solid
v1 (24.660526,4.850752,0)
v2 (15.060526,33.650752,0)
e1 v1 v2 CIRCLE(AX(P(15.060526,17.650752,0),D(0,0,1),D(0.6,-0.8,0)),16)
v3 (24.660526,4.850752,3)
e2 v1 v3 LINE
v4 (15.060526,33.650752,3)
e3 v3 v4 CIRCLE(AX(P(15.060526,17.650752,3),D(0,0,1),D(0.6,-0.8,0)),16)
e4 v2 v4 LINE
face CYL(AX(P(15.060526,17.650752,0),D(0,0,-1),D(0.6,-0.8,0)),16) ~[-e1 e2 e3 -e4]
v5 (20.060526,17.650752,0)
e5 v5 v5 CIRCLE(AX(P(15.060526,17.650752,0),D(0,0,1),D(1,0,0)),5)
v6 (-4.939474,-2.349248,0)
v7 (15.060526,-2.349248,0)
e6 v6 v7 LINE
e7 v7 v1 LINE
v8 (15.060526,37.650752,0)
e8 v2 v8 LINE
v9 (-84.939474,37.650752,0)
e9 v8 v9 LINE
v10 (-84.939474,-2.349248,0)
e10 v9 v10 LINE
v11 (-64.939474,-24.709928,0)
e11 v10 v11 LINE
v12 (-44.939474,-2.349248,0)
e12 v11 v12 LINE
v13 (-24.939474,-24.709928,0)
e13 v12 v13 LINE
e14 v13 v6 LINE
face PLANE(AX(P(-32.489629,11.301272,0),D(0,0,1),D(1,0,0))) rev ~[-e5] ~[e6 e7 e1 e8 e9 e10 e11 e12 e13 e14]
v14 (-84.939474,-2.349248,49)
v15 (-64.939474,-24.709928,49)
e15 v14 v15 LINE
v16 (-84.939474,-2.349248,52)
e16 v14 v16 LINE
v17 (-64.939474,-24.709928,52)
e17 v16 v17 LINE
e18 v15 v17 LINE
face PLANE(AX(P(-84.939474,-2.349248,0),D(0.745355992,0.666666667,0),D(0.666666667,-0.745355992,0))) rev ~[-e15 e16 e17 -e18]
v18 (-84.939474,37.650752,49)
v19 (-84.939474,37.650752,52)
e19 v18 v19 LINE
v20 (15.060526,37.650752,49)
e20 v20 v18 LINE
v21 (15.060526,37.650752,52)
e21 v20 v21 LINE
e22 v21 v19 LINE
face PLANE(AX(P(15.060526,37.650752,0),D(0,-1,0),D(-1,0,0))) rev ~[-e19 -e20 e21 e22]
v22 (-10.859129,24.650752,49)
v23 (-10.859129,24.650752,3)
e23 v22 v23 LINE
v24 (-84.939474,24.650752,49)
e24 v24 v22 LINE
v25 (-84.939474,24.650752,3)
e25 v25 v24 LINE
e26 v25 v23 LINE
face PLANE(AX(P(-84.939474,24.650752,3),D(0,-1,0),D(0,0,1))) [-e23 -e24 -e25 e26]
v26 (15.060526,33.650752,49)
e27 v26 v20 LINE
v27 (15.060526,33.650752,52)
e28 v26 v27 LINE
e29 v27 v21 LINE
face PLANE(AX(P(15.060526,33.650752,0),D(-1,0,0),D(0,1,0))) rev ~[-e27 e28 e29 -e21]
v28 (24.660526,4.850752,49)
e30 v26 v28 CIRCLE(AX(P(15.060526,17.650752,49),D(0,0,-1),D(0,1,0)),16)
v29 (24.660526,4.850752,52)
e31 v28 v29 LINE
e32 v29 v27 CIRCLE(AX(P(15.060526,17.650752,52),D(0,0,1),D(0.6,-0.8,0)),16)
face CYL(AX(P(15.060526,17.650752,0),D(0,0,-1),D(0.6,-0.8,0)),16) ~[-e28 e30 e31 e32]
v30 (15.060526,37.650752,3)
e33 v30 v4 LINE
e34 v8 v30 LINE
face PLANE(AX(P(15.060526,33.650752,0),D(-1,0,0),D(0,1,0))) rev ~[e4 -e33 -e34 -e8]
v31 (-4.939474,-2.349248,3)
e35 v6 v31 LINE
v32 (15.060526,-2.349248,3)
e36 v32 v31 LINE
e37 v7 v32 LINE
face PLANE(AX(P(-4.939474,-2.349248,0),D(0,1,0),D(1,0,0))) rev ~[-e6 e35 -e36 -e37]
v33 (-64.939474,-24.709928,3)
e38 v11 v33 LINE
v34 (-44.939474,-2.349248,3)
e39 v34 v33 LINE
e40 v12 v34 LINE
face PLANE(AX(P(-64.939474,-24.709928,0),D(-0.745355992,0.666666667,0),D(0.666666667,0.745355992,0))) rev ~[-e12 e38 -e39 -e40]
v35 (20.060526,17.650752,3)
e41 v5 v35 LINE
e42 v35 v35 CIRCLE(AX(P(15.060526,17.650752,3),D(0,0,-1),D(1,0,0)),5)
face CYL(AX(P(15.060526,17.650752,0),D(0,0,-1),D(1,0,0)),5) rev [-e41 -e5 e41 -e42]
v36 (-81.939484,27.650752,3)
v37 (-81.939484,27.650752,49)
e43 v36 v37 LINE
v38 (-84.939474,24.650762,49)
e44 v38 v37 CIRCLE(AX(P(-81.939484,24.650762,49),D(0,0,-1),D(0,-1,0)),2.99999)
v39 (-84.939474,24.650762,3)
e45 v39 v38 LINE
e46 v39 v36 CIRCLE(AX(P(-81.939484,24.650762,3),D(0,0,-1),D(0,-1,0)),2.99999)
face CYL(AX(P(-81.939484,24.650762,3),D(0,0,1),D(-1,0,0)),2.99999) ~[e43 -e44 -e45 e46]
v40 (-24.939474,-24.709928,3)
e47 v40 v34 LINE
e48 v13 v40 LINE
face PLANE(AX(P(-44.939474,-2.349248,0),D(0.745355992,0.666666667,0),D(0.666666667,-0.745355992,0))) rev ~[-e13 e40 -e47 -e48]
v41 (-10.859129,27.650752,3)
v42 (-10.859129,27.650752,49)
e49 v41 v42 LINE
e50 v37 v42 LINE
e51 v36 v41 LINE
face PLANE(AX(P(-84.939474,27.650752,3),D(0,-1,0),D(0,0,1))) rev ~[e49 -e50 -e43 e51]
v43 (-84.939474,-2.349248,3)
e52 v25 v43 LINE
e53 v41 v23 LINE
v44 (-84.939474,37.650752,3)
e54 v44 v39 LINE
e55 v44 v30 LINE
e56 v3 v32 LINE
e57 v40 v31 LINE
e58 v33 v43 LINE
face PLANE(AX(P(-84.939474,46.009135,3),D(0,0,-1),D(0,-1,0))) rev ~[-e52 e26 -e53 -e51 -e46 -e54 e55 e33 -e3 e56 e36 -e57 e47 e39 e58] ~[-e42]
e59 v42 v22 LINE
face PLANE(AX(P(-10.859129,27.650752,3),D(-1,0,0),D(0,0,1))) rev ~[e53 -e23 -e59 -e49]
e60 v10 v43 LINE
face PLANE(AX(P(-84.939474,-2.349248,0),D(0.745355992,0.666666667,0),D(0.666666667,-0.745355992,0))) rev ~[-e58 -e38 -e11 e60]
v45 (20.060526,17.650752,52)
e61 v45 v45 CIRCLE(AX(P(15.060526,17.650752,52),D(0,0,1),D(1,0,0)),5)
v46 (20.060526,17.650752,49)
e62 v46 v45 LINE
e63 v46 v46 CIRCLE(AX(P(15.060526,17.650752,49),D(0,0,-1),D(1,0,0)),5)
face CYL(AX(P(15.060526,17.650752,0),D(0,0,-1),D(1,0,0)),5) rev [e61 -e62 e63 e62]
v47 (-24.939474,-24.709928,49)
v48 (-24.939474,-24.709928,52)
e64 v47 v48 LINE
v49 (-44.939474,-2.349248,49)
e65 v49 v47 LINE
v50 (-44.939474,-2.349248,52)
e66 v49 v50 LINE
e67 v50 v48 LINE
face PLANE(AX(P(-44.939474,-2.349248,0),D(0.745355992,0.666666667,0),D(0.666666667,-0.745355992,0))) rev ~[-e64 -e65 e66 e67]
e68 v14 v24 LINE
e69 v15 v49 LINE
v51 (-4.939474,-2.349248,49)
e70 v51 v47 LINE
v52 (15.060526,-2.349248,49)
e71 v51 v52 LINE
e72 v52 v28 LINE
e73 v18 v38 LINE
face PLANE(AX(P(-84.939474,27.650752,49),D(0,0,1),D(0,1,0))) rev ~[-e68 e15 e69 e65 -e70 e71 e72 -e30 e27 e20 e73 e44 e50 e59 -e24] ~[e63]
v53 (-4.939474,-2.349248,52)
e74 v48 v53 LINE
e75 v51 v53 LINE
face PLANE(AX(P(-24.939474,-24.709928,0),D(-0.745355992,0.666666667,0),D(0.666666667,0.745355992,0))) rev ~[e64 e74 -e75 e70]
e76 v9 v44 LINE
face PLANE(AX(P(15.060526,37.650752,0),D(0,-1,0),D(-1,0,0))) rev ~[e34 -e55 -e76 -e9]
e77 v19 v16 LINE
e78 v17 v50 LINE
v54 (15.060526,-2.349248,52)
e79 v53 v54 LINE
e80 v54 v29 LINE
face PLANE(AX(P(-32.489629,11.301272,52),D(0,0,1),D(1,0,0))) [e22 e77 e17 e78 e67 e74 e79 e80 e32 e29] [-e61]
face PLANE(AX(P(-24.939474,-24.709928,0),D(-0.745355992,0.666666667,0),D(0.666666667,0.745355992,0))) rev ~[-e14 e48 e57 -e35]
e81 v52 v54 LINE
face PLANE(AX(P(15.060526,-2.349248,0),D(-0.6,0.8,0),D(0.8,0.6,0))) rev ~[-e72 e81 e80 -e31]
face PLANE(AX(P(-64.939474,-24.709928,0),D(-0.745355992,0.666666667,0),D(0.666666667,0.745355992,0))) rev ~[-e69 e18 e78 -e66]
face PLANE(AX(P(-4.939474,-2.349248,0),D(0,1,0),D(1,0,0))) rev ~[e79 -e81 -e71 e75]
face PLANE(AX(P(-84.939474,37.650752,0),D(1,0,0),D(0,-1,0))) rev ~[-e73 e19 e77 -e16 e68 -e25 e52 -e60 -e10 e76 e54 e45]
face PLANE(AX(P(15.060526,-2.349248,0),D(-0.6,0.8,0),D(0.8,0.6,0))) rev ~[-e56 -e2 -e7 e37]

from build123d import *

# Parameters (mm, degrees)
F0_R     = 5
F1_DEPTH = 52
F2_W     = 31.6232873572
F2_H     = 46
F2_W_2   = 27
F2_W_3   = 8.3583824264
F2_W_4   = 10
F3_DEPTH = 116.001
F4_R     = 2.99999
F5_W     = 50
F5_H     = 46
F6_DEPTH = 52.361679775


# Not quite as in the source:
# - a fillet or chamfer is up to 0.001 mm smaller than in the source, because OpenCascade refuses the exact size


with BuildPart() as f1:
    # F0 (on Top) → F1 (new body)
    with BuildSketch(Plane.XY):
        with BuildLine():
            Line((15.0605264698, 33.6507520748), (15.0605264698, 37.6507520748))
            Line((15.0605264698, 37.6507520748), (-84.9394735302, 37.6507520748))
            Line((-84.9394735302, 37.6507520748), (-84.9394735302, -2.3492479252))
            Line((-84.9394735302, -2.3492479252), (-64.9394735302, -24.7099277002))
            Line((-64.9394735302, -24.7099277002), (-44.9394735302, -2.3492479252))
            Line((-44.9394735302, -2.3492479252), (-24.9394735302, -24.7099277002))
            Line((-24.9394735302, -24.7099277002), (-4.9394735302, -2.3492479252))
            Line((-4.9394735302, -2.3492479252), (15.0605264698, -2.3492479252))
            Line((15.0605264698, -2.3492479252), (24.6605264698, 4.8507520748))
            ThreePointArc((24.6605264698, 4.8507520748), (30.2394592386, 22.7103963311), (15.0605264698, 33.6507520748))
        make_face()
        with Locations((15.0605264698, 17.6507520748)):
            Circle(F0_R, mode=Mode.SUBTRACT)
    extrude(amount=F1_DEPTH)

    # F2 (on face) → F3 (cut, through all)
    with BuildSketch(Plane(origin=(-84.9394735302, 0, 0), x_dir=(0, -1, 0), z_dir=(-1, 0, 0))):
        with Locations((18.1608916038, 26)):
            Rectangle(F2_W, F2_H)
        with Locations((-11.1507520748, 26)):
            Rectangle(F2_W_2, F2_H)
        with Locations((-41.829943288, 26)):
            Rectangle(F2_W_3, F2_H)
        with Locations((-32.6507520748, 26)):
            Rectangle(F2_W_4, F2_H)
    extrude(amount=-F3_DEPTH, mode=Mode.SUBTRACT)

    # F4 (radius 3 in the source; OpenCascade refuses exactly that, so slightly less here)
    f4_edges = [f1.edges().sort_by_distance(p)[0] for p in [
        (27.550522, 27.650752, 26),
        (-84.939474, 27.650752, 26),
    ]]
    fillet(f4_edges, radius=F4_R)

    # F5 (on face) → F6 (cut, through all)
    with BuildSketch(Plane(origin=(0, 27.6507520748, 0), x_dir=(-1, 0, 0), z_dir=(0, 1, 0))):
        with Locations((-14.1408709809, 26)):
            Rectangle(F5_W, F5_H)
    extrude(amount=-F6_DEPTH, mode=Mode.SUBTRACT)


solid = f1.part
